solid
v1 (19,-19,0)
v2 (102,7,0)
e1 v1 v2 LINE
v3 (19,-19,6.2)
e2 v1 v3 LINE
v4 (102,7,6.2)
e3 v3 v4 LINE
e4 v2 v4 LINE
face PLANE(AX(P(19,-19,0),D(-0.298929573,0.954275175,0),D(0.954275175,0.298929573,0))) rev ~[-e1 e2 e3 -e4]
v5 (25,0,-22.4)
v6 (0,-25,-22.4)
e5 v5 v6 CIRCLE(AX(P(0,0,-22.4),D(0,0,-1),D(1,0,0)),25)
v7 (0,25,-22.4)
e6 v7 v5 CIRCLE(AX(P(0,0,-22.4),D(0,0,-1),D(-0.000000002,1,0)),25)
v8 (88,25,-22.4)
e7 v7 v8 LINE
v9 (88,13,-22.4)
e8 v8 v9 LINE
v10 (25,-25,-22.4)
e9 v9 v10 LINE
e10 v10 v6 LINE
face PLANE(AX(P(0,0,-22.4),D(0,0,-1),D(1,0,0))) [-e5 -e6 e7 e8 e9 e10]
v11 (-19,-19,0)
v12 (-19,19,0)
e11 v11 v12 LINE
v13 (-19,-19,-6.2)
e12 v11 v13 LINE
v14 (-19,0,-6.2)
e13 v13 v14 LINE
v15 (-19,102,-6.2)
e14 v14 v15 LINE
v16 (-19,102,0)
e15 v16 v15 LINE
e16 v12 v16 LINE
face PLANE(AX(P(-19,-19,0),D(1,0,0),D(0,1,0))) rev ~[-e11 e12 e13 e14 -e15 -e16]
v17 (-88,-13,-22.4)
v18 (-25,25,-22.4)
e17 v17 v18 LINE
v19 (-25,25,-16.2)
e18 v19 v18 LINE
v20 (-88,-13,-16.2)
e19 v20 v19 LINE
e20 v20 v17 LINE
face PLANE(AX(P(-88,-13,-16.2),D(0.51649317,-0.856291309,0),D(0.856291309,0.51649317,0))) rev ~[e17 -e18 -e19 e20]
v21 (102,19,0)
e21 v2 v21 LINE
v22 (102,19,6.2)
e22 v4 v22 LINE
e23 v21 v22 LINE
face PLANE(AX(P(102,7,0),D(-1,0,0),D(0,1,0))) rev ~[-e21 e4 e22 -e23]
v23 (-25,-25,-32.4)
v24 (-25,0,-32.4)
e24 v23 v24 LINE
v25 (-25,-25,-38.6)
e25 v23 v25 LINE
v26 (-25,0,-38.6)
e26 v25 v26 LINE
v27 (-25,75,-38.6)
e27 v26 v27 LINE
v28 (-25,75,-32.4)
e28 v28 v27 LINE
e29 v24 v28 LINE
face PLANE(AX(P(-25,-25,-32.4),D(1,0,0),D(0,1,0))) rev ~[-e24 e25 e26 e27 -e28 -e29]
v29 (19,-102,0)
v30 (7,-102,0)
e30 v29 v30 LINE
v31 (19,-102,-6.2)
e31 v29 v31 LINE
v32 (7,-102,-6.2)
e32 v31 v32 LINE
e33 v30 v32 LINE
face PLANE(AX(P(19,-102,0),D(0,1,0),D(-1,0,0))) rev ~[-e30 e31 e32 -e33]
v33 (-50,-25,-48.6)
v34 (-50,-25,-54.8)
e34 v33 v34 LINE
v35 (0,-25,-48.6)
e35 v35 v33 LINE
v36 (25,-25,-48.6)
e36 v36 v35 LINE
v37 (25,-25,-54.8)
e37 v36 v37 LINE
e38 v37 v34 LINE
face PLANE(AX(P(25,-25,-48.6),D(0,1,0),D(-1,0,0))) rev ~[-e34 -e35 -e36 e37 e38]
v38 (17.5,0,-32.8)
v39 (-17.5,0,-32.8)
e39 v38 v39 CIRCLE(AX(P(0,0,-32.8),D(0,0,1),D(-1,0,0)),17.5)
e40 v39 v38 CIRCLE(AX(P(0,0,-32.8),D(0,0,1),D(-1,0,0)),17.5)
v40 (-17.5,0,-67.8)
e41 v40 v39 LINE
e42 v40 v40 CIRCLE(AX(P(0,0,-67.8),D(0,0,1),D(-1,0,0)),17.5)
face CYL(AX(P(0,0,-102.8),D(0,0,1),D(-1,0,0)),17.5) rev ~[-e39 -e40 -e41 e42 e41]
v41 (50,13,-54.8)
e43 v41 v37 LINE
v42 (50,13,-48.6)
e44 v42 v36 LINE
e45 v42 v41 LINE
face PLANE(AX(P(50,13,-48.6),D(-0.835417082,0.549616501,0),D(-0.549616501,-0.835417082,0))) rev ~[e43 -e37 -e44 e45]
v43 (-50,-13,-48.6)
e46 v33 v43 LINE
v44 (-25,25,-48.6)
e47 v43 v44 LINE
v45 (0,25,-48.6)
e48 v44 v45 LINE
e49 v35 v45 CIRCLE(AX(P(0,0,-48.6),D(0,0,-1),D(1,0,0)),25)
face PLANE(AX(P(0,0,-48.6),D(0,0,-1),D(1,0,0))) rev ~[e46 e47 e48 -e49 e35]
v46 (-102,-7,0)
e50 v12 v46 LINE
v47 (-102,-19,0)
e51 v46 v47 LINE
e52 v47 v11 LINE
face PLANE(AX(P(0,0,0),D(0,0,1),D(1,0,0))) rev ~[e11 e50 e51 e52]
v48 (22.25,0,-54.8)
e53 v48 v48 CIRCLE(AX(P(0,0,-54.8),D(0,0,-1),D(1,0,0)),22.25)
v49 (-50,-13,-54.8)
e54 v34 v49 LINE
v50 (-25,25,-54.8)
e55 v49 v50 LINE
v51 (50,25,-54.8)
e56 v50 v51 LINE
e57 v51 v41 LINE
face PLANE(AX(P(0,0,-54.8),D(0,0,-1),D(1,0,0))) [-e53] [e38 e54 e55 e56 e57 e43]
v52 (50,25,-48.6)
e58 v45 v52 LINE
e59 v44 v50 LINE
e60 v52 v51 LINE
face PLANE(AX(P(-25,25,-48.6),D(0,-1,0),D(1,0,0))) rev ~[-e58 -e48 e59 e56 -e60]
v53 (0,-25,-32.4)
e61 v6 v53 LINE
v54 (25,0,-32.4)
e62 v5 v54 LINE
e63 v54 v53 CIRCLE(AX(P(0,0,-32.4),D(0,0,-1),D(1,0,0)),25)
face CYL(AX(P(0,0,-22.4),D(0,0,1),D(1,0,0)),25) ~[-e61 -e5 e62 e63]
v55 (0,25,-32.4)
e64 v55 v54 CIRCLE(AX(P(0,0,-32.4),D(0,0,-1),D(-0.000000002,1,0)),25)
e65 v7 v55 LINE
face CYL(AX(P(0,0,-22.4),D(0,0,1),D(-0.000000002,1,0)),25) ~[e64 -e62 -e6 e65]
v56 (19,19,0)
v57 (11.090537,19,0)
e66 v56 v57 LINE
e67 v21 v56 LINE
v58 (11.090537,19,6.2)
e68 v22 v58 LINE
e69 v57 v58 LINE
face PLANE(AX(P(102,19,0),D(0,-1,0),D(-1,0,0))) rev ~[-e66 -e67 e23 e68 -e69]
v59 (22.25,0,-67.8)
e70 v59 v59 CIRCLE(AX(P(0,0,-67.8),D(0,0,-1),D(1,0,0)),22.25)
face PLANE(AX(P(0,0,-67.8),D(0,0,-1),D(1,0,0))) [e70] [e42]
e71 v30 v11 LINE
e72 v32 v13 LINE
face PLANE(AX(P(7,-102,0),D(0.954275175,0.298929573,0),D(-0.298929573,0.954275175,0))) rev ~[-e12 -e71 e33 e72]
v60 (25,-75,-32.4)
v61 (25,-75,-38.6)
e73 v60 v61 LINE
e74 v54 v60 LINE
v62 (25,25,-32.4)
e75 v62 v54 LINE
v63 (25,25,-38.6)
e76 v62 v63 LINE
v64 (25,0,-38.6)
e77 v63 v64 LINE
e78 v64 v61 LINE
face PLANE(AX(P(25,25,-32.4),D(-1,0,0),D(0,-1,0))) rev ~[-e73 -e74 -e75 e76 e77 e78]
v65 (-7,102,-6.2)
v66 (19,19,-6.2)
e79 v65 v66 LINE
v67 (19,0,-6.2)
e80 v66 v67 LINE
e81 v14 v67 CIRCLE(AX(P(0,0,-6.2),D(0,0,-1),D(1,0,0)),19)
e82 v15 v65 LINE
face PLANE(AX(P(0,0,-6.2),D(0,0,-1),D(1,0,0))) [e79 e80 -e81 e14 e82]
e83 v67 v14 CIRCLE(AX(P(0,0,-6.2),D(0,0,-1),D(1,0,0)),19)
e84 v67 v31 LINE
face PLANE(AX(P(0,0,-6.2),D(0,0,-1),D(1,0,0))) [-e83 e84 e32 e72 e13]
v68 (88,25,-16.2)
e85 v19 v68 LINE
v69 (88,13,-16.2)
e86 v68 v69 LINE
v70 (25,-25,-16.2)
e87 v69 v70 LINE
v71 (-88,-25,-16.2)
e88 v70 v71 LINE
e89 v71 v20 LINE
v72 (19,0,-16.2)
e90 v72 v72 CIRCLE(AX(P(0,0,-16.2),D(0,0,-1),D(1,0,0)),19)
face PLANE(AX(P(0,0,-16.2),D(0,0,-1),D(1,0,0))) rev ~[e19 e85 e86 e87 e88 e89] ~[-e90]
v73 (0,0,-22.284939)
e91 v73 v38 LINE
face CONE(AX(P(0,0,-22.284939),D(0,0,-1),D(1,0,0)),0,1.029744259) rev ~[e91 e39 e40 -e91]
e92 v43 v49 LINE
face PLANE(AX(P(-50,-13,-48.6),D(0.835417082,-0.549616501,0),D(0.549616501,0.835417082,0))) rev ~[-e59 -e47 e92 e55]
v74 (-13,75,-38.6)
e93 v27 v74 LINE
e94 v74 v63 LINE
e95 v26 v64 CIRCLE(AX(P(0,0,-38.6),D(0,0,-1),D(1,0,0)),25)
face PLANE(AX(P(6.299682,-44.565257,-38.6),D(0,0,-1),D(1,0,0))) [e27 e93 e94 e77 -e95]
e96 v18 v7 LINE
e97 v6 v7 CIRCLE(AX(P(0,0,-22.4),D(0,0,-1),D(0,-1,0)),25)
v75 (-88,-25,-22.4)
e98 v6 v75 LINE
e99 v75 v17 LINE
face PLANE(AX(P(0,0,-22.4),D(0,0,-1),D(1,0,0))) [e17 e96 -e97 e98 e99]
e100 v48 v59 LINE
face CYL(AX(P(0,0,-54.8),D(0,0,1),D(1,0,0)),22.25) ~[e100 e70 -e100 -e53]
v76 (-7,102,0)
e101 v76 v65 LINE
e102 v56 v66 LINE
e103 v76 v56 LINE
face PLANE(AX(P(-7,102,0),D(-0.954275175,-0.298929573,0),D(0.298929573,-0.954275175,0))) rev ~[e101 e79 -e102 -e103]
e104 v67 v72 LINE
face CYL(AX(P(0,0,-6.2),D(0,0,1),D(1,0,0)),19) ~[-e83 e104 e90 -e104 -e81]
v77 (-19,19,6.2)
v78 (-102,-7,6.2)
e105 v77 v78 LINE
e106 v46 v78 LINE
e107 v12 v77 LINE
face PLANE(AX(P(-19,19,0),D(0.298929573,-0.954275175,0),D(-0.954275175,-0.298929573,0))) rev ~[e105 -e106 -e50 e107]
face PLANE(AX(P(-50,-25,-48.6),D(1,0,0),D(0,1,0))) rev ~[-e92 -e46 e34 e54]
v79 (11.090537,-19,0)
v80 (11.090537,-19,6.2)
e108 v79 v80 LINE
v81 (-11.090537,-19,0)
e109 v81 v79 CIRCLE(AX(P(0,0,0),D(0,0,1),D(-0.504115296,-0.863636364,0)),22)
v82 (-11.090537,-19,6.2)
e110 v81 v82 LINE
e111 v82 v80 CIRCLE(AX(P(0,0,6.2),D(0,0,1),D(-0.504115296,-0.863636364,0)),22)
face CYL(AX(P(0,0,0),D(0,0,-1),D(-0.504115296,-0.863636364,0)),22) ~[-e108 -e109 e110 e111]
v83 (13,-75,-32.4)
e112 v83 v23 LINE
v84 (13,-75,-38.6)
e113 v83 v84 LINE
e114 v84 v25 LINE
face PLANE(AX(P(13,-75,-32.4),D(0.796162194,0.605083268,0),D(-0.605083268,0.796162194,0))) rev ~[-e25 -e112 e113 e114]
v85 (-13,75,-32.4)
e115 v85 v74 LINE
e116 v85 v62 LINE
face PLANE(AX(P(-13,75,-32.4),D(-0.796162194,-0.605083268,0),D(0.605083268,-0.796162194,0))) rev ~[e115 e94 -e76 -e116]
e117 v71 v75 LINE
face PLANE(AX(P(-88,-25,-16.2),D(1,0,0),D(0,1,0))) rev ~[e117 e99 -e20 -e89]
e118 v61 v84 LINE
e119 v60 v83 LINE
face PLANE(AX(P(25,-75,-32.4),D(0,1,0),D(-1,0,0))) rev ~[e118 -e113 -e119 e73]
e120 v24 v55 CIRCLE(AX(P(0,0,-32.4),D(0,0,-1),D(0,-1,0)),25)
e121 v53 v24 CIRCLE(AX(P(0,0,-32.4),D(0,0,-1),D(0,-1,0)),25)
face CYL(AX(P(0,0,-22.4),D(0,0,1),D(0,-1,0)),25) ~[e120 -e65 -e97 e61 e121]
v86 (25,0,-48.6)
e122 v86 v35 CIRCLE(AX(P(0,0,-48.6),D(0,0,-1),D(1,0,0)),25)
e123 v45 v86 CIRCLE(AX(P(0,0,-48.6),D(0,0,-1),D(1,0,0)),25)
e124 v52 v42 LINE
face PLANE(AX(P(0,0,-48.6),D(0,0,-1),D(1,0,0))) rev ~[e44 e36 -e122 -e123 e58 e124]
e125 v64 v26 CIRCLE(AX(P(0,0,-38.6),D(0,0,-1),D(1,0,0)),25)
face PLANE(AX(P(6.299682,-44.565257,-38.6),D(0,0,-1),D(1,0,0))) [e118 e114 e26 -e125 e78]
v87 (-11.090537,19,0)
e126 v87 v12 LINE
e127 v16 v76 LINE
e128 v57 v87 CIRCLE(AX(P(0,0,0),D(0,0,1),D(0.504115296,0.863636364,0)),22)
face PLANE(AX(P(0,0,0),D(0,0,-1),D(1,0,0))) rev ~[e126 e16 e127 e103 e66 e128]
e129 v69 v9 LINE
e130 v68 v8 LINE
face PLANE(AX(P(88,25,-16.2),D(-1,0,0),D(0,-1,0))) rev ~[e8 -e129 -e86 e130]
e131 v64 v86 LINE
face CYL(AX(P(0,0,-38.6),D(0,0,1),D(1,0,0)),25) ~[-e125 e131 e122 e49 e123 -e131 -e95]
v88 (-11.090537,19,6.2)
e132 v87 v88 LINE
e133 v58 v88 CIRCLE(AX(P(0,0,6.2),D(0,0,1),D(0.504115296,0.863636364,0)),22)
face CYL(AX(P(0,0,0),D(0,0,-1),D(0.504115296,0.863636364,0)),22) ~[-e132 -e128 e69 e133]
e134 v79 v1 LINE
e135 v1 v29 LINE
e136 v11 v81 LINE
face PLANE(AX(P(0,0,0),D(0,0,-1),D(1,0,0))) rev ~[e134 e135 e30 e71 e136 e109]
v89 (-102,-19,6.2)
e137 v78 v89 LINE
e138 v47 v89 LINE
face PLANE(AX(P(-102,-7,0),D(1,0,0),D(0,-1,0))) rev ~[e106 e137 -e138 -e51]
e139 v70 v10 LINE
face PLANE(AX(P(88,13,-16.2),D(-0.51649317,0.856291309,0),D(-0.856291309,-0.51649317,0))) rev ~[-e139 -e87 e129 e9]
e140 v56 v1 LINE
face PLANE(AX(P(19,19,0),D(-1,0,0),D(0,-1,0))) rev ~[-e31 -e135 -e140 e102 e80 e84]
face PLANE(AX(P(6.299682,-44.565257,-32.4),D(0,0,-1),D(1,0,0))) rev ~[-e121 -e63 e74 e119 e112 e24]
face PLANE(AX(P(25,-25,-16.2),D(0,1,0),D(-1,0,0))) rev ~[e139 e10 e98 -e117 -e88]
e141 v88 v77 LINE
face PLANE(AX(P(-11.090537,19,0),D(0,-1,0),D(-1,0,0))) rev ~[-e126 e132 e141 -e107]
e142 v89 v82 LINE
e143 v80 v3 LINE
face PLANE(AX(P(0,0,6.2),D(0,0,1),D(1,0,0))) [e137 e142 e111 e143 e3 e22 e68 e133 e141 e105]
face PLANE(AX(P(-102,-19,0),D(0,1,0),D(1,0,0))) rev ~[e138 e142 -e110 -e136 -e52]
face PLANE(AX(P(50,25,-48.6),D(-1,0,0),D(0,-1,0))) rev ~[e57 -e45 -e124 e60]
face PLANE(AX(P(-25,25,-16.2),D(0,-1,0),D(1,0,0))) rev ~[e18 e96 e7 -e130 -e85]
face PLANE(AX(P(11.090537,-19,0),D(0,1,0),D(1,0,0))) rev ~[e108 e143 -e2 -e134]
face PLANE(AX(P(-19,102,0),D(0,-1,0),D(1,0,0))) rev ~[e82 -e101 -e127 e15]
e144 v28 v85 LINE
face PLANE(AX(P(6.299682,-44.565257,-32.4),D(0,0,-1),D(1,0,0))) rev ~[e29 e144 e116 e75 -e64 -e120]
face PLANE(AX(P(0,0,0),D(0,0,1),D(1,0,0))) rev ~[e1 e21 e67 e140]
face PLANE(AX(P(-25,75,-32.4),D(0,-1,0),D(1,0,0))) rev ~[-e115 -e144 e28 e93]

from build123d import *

# Parameters (mm, degrees)
F1_DEPTH  = 6.2
F3_DEPTH  = 6.2
F5_DEPTH  = 10
F6_W      = 50
F6_H      = 50
F6_R      = 19
F7_DEPTH  = 6.2
F9_DEPTH  = 10
F11_DEPTH = 6.2
F13_DEPTH = 10
F15_DEPTH = 6.2
F16_R     = 22.25
F17_DEPTH = 13
F19_D     = 35
F19_DEPTH = 35
F19_TIP   = 10.515060833


with BuildPart() as f1:
    # F0 (on Top) → F1 (new body)
    with BuildSketch(Plane.XY):
        with BuildLine():
            Line((102, 19), (11.0905365064, 19))
            ThreePointArc((11.0905365064, 19), (0, 22), (-11.0905365064, 19))
            Line((-11.0905365064, 19), (-19, 19))
            Line((-19, 19), (-102, -7))
            Line((-102, -7), (-102, -19))
            Line((-102, -19), (-11.0905365064, -19))
            ThreePointArc((-11.0905365064, -19), (0, -22), (11.0905365064, -19))
            Line((11.0905365064, -19), (19, -19))
            Line((19, -19), (102, 7))
            Line((102, 7), (102, 19))
        make_face()
    extrude(amount=F1_DEPTH)

    # F2 (on face) → F3 (join)
    with BuildSketch(Plane(origin=(0, 0, 0), x_dir=(1, 0, 0), z_dir=(0, 0, -1))):
        with BuildLine():
            Line((-19, 19), (-19, 0))
            Line((-19, 0), (-19, -19))
            Line((-19, -19), (-11.0905365064, -19))
            ThreePointArc((-11.0905365064, -19), (0, -22), (11.0905365064, -19))
            Line((11.0905365064, -19), (19, -19))
            Line((19, -19), (19, 0))
            Line((19, 0), (19, 19))
            Line((19, 19), (11.0905365064, 19))
            ThreePointArc((11.0905365064, 19), (0, 22), (-11.0905365064, 19))
            Line((-11.0905365064, 19), (-19, 19))
        make_face()
        with BuildLine():
            Line((-11.0905365064, -19), (-19, -19))
            Line((-19, -19), (-19, -102))
            Line((-19, -102), (-7, -102))
            Line((-7, -102), (19, -19))
            Line((19, -19), (11.0905365064, -19))
            ThreePointArc((11.0905365064, -19), (0, -22), (-11.0905365064, -19))
        make_face()
        with BuildLine():
            Line((7, 102), (-19, 19))
            Line((-19, 19), (-11.0905365064, 19))
            ThreePointArc((-11.0905365064, 19), (0, 22), (11.0905365064, 19))
            Line((11.0905365064, 19), (19, 19))
            Line((19, 19), (19, 102))
            Line((19, 102), (7, 102))
        make_face()
    extrude(amount=F3_DEPTH)

    # F4 (on face) → F5 (join)
    with BuildSketch(Plane(origin=(0, 0, -6.2), x_dir=(1, 0, 0), z_dir=(0, 0, -1))):
        with BuildLine():
            ThreePointArc((-19, 0), (0, -19), (19, 0))
            ThreePointArc((19, 0), (0, 19), (-19, 0))
        make_face()
    extrude(amount=F5_DEPTH)

    # F6 (on face) → F7 (join)
    with BuildSketch(Plane(origin=(0, 0, -16.2), x_dir=(1, 0, 0), z_dir=(0, 0, -1))):
        Rectangle(F6_W, F6_H)
        Circle(F6_R, mode=Mode.SUBTRACT)
        Polygon((25, 25), (25, -25), (88, -25), (88, -13), align=None)
        Polygon((-88, 13), (-25, -25), (-25, 25), (-88, 25), align=None)
        Circle(F6_R)
    extrude(amount=F7_DEPTH)

    # F8 (on face) → F9 (join)
    with BuildSketch(Plane(origin=(0, 0, -22.4), x_dir=(1, 0, 0), z_dir=(0, 0, -1))):
        with BuildLine():
            ThreePointArc((-5.83e-08, -25), (17.677669509, -17.6776695503), (25, 0))
            ThreePointArc((25, 0), (17.6776695297, 17.6776695297), (0, 25))
            ThreePointArc((0, 25), (-25, 2.92e-08), (-5.83e-08, -25))
        make_face()
    extrude(amount=F9_DEPTH)

    # F10 (on face) → F11 (join)
    with BuildSketch(Plane(origin=(0, 0, -32.4), x_dir=(1, 0, 0), z_dir=(0, 0, -1))):
        Polygon((13, 75), (-25, 25), (4.22e-08, 25), (25, 25), (25, 75), align=None)
        with BuildLine():
            ThreePointArc((4.22e-08, 25), (17.6776695446, 17.6776695147), (25, 0))
            Line((25, 0), (25, 25))
            Line((25, 25), (4.22e-08, 25))
        make_face()
        with BuildLine():
            ThreePointArc((-25, 0), (-17.6776695332, -17.6776695262), (-9.9e-09, -25))
            ThreePointArc((-9.9e-09, -25), (17.6776695262, -17.6776695332), (25, 0))
            ThreePointArc((25, 0), (17.6776695446, 17.6776695147), (4.22e-08, 25))
            ThreePointArc((4.22e-08, 25), (-17.6776695147, 17.6776695446), (-25, 0))
        make_face()
        with BuildLine():
            ThreePointArc((25, 0), (17.6776695262, -17.6776695332), (-9.9e-09, -25))
            Line((-9.9e-09, -25), (25, -25))
            Line((25, -25), (25, 0))
        make_face()
        Polygon((-9.9e-09, -25), (-25, -25), (-25, -75), (-13, -75), (25, -25), align=None)
        with BuildLine():
            Line((-25, 0), (-25, -25))
            Line((-25, -25), (-9.9e-09, -25))
            ThreePointArc((-9.9e-09, -25), (-17.6776695332, -17.6776695262), (-25, 0))
        make_face()
        with BuildLine():
            Line((-25, 25), (-25, 0))
            ThreePointArc((-25, 0), (-17.6776695147, 17.6776695446), (4.22e-08, 25))
            Line((4.22e-08, 25), (-25, 25))
        make_face()
    extrude(amount=F11_DEPTH)

    # F12 (on face) → F13 (join)
    with BuildSketch(Plane(origin=(0, 0, -38.6), x_dir=(1, 0, 0), z_dir=(0, 0, -1))):
        with BuildLine():
            ThreePointArc((-25, 2.61e-08), (-1.3e-08, -25), (25, 0))
            ThreePointArc((25, 0), (1.3e-08, 25), (-25, 2.61e-08))
        make_face()
    extrude(amount=F13_DEPTH)

    # F14 (on face) → F15 (join)
    with BuildSketch(Plane(origin=(0, 0, -48.6), x_dir=(1, 0, 0), z_dir=(0, 0, -1))):
        with BuildLine():
            ThreePointArc((-25, 0), (-17.6776695204, -17.6776695389), (2.61e-08, -25))
            ThreePointArc((2.61e-08, -25), (17.6776695389, -17.6776695204), (25, 0))
            ThreePointArc((25, 0), (17.6776695389, 17.6776695204), (2.61e-08, 25))
            ThreePointArc((2.61e-08, 25), (-17.6776695204, 17.6776695389), (-25, 0))
        make_face()
        with BuildLine():
            ThreePointArc((2.61e-08, 25), (17.6776695389, 17.6776695204), (25, 0))
            Line((25, 0), (25, 25))
            Line((25, 25), (2.61e-08, 25))
        make_face()
        with BuildLine():
            Line((2.61e-08, -25), (25, -25))
            Line((25, -25), (25, 0))
            ThreePointArc((25, 0), (17.6776695389, -17.6776695204), (2.61e-08, -25))
        make_face()
        with BuildLine():
            Line((-25, -25), (2.61e-08, -25))
            ThreePointArc((2.61e-08, -25), (-17.6776695204, -17.6776695389), (-25, 0))
            Line((-25, 0), (-25, -25))
        make_face()
        with BuildLine():
            Line((-25, 25), (-25, 0))
            ThreePointArc((-25, 0), (-17.6776695204, 17.6776695389), (2.61e-08, 25))
            Line((2.61e-08, 25), (-25, 25))
        make_face()
        Polygon((-50, 13), (-25, -25), (-25, 0), (-25, 25), (-50, 25), align=None)
        Polygon((25, 0), (25, -25), (50, -25), (50, -13), (25, 25), align=None)
    extrude(amount=F15_DEPTH)

    # F16 (on face) → F17 (join)
    with BuildSketch(Plane(origin=(0, 0, -54.8), x_dir=(1, 0, 0), z_dir=(0, 0, -1))):
        Circle(F16_R)
    extrude(amount=F17_DEPTH)

    # F19
    with Locations(Plane(origin=(0, 0, -67.8), x_dir=(1, 0, 0), z_dir=(0, 0, -1))):
        with Locations((0, 0)):
            Hole(F19_D / 2, depth=F19_DEPTH)
            with Locations((0, 0, -(F19_DEPTH + F19_TIP / 2))):  # 118° drill point
                Cone(0, F19_D / 2, F19_TIP, mode=Mode.SUBTRACT)


solid = f1.part
